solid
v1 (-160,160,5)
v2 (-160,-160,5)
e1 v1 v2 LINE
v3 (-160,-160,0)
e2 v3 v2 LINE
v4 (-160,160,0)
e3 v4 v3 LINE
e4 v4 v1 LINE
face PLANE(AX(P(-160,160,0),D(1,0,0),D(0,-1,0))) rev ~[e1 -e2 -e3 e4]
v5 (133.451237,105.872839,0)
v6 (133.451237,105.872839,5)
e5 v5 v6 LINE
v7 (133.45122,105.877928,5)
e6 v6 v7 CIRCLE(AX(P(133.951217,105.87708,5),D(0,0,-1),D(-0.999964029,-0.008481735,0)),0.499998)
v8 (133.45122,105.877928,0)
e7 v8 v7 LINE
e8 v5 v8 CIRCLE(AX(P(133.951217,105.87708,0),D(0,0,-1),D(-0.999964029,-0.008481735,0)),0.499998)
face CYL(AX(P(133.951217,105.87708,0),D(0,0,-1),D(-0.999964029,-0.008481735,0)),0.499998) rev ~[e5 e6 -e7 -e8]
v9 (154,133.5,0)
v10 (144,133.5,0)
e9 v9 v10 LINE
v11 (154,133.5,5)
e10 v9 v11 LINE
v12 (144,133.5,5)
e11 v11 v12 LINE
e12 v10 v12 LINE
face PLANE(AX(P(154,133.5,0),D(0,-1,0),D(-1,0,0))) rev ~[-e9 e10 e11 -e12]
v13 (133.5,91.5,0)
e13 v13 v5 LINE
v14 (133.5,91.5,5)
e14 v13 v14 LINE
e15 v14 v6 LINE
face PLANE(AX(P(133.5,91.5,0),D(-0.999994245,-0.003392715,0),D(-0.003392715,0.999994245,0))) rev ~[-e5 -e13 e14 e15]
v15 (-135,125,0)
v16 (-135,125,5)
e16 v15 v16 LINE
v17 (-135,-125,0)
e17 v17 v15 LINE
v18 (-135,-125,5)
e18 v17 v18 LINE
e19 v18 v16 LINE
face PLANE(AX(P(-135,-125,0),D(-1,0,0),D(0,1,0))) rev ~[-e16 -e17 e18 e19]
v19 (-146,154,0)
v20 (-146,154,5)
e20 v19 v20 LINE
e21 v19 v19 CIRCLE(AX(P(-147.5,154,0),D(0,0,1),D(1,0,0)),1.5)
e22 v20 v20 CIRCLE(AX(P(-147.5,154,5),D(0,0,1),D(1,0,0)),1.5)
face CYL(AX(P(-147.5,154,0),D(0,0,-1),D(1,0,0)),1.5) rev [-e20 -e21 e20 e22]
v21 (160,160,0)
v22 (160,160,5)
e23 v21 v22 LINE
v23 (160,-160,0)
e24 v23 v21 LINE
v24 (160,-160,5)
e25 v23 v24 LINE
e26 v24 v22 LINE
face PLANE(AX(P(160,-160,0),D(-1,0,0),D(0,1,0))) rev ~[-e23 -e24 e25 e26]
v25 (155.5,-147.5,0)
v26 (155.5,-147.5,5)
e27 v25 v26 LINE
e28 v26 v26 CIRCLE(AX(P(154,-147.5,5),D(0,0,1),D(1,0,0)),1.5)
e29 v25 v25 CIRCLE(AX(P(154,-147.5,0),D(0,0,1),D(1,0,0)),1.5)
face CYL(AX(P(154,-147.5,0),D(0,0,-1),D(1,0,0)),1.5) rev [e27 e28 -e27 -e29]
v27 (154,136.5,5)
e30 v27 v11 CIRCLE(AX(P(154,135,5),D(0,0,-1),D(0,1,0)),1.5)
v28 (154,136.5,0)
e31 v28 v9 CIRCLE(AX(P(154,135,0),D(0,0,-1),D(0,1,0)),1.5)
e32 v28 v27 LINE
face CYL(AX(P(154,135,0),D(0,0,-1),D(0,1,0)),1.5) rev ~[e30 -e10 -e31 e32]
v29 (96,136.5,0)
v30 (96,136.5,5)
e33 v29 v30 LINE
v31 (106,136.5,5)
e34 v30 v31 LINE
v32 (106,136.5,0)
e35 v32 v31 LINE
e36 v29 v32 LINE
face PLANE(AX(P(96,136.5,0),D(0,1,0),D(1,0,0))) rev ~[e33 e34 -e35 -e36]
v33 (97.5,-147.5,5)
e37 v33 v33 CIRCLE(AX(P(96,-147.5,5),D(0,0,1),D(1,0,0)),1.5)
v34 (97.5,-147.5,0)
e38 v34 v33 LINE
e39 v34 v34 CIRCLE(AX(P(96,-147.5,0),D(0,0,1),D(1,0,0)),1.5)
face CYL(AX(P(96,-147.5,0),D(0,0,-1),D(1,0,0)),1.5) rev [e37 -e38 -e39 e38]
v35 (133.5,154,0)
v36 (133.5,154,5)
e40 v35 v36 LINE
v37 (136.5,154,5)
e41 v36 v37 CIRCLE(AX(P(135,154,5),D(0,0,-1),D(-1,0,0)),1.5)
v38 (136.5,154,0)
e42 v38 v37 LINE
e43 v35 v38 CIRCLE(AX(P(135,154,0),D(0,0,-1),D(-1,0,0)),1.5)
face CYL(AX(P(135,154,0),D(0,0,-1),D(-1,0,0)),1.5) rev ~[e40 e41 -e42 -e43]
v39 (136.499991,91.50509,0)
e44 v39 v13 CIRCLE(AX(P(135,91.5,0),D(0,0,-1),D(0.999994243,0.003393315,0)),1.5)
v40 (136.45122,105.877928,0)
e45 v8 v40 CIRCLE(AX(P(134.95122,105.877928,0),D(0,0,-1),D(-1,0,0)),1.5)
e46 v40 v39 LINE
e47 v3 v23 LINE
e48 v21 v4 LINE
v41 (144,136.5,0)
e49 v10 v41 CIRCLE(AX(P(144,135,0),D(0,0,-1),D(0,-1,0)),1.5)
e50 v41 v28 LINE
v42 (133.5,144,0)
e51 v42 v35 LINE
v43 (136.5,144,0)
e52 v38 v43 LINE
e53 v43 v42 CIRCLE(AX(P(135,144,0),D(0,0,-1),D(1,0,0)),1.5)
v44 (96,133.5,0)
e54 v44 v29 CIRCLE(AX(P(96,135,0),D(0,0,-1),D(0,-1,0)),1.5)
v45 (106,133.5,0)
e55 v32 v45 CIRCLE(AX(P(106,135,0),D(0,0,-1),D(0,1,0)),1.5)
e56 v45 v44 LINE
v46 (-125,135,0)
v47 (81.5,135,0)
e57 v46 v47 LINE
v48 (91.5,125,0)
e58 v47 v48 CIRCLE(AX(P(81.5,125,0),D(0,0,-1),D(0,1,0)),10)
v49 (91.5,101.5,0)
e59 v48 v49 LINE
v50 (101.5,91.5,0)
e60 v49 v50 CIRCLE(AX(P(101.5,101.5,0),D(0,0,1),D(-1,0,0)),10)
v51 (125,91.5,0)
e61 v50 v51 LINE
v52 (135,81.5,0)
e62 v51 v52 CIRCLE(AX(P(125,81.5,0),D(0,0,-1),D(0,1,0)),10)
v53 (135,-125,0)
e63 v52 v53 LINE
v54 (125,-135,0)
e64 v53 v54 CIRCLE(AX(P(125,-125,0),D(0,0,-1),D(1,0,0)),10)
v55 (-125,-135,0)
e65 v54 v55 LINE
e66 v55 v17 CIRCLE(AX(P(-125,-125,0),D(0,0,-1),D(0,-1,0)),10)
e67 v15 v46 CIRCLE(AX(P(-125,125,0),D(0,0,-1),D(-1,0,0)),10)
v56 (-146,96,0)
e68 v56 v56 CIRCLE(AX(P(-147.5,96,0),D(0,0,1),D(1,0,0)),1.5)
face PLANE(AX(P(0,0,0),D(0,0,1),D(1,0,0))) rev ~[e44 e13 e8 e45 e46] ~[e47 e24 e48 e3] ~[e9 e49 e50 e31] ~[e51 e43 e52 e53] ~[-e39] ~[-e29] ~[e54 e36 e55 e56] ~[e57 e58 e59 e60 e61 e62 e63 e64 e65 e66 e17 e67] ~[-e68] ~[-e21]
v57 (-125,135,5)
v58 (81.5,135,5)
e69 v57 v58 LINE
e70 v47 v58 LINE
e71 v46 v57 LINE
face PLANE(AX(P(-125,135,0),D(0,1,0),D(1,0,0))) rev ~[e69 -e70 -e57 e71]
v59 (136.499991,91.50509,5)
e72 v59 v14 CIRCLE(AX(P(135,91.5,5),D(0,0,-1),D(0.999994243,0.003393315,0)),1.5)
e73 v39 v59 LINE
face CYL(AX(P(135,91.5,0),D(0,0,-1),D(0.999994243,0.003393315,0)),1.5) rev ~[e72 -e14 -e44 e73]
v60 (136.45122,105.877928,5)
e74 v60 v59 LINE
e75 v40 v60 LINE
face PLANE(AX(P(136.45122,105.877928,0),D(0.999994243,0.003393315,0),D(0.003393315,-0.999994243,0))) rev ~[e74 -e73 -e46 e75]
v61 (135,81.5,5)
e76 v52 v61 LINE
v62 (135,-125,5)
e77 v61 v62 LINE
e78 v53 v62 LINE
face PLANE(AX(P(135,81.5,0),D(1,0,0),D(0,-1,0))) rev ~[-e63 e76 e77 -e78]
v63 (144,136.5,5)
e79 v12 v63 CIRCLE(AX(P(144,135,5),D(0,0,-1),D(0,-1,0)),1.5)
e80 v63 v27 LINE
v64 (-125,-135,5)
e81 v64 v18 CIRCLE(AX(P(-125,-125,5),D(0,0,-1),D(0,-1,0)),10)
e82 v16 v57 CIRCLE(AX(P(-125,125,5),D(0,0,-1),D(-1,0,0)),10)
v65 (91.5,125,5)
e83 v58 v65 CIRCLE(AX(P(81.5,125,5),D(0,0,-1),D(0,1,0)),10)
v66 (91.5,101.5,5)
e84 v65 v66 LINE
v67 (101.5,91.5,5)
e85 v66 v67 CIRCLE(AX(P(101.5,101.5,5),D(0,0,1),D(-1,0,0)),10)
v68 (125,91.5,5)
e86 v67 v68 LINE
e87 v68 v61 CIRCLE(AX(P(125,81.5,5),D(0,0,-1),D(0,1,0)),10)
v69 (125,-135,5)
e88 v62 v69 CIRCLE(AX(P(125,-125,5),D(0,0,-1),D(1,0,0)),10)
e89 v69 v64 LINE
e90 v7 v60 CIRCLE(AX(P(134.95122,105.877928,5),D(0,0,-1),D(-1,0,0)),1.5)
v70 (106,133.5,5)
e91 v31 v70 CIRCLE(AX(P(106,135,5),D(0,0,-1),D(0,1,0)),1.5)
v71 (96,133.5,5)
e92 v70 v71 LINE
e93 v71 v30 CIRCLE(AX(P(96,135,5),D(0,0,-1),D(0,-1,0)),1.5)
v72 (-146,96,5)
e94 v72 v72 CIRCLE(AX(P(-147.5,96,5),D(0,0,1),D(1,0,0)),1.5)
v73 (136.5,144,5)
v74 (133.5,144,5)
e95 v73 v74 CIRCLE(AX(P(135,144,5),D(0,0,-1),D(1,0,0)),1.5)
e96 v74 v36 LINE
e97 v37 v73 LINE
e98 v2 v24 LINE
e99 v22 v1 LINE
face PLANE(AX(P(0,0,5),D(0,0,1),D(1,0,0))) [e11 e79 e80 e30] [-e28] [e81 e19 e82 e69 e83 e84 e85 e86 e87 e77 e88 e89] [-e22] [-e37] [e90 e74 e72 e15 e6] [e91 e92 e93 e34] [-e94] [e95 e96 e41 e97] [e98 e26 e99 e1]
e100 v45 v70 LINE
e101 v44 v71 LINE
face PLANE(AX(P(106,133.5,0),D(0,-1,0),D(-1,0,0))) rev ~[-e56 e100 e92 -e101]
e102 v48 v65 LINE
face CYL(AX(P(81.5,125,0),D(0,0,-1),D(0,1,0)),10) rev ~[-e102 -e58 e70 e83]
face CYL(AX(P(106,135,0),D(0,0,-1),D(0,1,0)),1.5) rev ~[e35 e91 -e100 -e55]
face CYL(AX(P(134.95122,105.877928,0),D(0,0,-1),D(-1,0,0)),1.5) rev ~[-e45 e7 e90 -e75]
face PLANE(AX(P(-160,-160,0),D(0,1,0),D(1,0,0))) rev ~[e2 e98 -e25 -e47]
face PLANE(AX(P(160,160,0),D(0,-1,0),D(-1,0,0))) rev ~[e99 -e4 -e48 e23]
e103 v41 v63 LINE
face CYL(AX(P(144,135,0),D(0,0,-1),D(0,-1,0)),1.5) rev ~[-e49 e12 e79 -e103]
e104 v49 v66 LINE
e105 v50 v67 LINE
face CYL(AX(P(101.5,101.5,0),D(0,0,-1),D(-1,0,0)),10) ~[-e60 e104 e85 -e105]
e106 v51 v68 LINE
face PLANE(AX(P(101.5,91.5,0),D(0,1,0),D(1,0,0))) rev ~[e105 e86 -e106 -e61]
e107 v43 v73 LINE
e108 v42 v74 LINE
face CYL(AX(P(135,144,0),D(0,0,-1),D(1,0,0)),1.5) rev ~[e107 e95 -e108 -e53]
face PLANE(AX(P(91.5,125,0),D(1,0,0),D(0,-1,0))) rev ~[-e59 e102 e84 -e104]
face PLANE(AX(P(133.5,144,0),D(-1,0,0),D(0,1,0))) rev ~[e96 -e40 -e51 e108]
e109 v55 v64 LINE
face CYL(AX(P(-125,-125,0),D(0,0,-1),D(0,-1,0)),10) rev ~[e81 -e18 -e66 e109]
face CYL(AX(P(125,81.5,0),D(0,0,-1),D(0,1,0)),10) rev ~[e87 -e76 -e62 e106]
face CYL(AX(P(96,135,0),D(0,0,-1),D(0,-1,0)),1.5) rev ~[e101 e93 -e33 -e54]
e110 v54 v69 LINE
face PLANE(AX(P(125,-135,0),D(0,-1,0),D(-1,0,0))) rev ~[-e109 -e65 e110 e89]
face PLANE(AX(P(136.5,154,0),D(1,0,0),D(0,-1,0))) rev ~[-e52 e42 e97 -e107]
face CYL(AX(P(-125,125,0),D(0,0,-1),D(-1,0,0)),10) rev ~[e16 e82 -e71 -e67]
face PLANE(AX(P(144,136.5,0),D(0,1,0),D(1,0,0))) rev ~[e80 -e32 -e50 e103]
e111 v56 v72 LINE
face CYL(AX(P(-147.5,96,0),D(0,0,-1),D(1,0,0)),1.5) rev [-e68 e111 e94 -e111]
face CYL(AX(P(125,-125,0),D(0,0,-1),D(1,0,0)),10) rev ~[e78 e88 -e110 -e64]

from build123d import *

# Parameters (mm, degrees)
F0_R     = 1.5
F1_DEPTH = 5


# Not quite as in the source:
# - ends of sketch curves that miss each other by under 0.0002 mm in the source are joined


with BuildPart() as f1:
    # F0 (on Top) → F1 (new body)
    with BuildSketch(Plane.XY):
        Polygon((-160, -160), (160, -160), (160, 110), (160, 160), (110, 160), (-160, 160), align=None)
        with Locations((96, -147.5)):
            Circle(F0_R, mode=Mode.SUBTRACT)
        with Locations((154, -147.5)):
            Circle(F0_R, mode=Mode.SUBTRACT)
        with Locations((-147.5, 96)):
            Circle(F0_R, mode=Mode.SUBTRACT)
        with Locations((-147.5, 154)):
            Circle(F0_R, mode=Mode.SUBTRACT)
        with BuildLine():
            ThreePointArc((135, -125), (132.0710678119, -132.0710678119), (125, -135))
            Line((125, -135), (-125, -135))
            ThreePointArc((-125, -135), (-132.0710678119, -132.0710678119), (-135, -125))
            Line((-135, -125), (-135, 125))
            ThreePointArc((-135, 125), (-132.0710678119, 132.0710678119), (-125, 135))
            Line((-125, 135), (81.5, 135))
            ThreePointArc((81.5, 135), (88.5710678119, 132.0710678119), (91.5, 125))
            Line((91.5, 125), (91.5, 101.5))
            ThreePointArc((91.5, 101.5), (94.4289321881, 94.4289321881), (101.5, 91.5))
            Line((101.5, 91.5), (125, 91.5))
            ThreePointArc((125, 91.5), (132.0710678119, 88.5710678119), (135, 81.5))
            Line((135, 81.5), (135, -125))
        make_face(mode=Mode.SUBTRACT)
        with BuildLine():
            ThreePointArc((133.4512195122, 105.877928352), (134.9512195122, 107.377928352), (136.4512195122, 105.877928352))
            Line((136.4512195122, 105.877928352), (136.499991364, 91.5050899728))
            ThreePointArc((136.499991364, 91.5050899728), (135.0025449901, 90.000002159), (133.5, 91.5))
            Line((133.5, 91.5), (133.451236778, 105.8728393094))
            ThreePointArc((133.451236778, 105.8728393094), (133.4512216704, 105.8753838124), (133.4512195122, 105.877928352))
        make_face(mode=Mode.SUBTRACT)
        with BuildLine():
            ThreePointArc((96, 133.5), (94.5, 135), (96, 136.5))
            Line((96, 136.5), (106, 136.5))
            ThreePointArc((106, 136.5), (107.5, 135), (106, 133.5))
            Line((106, 133.5), (96, 133.5))
        make_face(mode=Mode.SUBTRACT)
        with BuildLine():
            ThreePointArc((144, 133.5), (142.5, 135), (144, 136.5))
            Line((144, 136.5), (154, 136.5))
            ThreePointArc((154, 136.5), (155.5, 135), (154, 133.5))
            Line((154, 133.5), (144, 133.5))
        make_face(mode=Mode.SUBTRACT)
        with BuildLine():
            ThreePointArc((133.5, 154), (135, 155.5), (136.5, 154))
            Line((136.5, 154), (136.5, 144))
            ThreePointArc((136.5, 144), (135, 142.5), (133.5, 144))
            Line((133.5, 144), (133.5, 154))
        make_face(mode=Mode.SUBTRACT)
    extrude(amount=F1_DEPTH)


solid = f1.part
